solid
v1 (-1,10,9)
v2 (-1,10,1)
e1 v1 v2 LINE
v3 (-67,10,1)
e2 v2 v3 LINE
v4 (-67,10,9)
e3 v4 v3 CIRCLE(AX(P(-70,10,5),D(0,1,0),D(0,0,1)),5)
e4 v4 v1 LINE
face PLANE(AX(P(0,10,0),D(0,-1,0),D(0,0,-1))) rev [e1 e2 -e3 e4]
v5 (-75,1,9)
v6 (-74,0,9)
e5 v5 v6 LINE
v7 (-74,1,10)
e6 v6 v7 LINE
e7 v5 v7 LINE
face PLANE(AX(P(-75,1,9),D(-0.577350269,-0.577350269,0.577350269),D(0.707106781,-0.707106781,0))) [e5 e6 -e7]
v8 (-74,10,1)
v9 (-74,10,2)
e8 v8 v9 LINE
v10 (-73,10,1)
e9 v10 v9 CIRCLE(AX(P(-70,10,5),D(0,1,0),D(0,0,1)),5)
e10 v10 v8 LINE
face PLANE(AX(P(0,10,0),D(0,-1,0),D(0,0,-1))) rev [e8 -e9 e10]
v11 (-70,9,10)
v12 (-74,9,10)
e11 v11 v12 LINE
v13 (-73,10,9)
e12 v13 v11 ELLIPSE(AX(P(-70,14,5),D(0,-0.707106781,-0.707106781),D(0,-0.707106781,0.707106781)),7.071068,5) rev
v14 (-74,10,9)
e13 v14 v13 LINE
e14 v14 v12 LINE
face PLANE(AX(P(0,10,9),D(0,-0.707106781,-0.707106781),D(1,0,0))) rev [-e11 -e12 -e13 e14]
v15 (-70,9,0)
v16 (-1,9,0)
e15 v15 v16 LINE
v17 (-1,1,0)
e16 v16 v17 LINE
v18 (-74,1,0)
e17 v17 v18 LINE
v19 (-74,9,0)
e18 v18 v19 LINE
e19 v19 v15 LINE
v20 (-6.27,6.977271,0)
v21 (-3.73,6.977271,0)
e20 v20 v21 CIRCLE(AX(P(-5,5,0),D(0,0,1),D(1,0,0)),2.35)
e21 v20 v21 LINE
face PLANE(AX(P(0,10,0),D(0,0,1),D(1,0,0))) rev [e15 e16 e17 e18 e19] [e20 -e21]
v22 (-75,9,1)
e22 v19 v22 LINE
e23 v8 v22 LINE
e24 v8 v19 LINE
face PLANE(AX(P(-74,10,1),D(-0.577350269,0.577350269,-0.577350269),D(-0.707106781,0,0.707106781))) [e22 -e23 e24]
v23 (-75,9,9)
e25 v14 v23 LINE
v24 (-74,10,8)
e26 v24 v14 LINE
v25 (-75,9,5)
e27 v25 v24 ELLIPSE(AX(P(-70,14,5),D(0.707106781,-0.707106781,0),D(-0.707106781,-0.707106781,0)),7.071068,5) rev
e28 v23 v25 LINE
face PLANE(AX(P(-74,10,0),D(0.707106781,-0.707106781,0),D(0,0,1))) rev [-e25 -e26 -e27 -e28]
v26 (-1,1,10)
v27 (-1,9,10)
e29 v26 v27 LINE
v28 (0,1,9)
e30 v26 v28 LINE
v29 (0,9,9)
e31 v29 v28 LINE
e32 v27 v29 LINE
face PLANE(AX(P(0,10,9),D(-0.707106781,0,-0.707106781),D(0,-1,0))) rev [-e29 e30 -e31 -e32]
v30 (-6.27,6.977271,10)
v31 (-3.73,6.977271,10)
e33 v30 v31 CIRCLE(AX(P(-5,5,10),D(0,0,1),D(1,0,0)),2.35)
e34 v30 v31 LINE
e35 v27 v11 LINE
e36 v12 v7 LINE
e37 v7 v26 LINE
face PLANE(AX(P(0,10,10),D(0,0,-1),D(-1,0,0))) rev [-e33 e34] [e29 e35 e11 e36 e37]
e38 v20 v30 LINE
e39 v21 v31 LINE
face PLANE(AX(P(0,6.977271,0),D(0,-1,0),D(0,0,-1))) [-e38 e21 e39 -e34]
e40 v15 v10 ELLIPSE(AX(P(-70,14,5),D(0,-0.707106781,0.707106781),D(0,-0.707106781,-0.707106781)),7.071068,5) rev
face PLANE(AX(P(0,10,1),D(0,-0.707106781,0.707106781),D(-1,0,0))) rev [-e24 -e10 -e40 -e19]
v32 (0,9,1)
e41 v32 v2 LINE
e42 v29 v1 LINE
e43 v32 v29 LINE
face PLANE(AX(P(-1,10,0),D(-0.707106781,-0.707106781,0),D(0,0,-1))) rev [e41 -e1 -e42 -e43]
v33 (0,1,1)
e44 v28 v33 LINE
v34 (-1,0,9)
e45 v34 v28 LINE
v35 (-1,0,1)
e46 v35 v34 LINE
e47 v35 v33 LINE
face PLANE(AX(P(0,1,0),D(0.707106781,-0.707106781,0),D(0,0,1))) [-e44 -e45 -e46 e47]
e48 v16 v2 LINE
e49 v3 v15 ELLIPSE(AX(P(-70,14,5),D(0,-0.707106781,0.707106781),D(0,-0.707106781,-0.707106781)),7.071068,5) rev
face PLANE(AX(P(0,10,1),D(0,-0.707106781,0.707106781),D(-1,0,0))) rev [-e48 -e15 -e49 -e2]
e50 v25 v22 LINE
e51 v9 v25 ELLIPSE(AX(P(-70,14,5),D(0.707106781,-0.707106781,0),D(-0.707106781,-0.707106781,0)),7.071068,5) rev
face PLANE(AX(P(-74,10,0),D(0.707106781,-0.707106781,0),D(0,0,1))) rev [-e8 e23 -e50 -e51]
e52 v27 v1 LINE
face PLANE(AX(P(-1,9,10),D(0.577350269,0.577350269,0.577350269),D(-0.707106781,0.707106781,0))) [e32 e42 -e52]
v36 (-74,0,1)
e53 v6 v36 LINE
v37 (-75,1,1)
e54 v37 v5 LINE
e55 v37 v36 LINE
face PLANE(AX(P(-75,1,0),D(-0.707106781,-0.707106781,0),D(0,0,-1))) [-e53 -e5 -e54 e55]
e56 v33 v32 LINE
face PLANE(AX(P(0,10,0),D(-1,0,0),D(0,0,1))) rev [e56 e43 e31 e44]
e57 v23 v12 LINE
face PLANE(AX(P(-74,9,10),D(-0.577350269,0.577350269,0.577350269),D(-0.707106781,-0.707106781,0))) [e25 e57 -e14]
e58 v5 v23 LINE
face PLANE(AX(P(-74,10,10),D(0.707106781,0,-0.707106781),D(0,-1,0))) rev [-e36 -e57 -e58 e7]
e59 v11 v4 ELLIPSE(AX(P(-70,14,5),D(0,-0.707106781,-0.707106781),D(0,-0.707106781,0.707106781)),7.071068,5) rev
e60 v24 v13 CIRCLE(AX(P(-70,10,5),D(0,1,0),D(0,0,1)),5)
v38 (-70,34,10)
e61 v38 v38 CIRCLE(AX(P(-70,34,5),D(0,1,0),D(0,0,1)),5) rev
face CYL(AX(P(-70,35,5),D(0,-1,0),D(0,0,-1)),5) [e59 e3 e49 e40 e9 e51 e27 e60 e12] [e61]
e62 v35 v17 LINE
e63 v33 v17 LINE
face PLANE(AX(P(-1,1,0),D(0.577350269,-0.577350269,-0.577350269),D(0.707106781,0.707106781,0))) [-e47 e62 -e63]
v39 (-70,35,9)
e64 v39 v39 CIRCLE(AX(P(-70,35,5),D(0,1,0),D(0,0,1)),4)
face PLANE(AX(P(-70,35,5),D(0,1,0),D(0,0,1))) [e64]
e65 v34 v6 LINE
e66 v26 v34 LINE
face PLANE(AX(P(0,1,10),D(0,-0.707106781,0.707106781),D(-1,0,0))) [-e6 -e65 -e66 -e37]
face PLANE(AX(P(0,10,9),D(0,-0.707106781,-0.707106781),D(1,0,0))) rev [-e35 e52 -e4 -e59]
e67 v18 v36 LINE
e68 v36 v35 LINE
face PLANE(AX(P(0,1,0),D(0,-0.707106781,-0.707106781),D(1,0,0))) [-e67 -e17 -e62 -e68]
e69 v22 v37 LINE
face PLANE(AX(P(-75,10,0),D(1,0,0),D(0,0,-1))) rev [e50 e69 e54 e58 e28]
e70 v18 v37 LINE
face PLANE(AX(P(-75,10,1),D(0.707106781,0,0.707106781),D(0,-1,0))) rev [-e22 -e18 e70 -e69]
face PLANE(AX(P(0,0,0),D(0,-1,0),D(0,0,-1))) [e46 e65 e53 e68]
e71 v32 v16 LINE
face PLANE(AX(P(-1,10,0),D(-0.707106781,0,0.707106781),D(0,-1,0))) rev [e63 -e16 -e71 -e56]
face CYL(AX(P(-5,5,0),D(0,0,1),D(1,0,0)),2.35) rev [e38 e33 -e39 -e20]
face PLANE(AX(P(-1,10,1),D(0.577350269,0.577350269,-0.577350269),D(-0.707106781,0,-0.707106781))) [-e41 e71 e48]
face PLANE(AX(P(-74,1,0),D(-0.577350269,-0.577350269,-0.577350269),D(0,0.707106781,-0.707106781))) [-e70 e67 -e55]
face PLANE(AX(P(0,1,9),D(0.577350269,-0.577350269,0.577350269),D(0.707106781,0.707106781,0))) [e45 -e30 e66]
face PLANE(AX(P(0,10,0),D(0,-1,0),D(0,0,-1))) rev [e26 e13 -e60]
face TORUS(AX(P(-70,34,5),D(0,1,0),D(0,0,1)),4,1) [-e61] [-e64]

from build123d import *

# Parameters (mm, degrees)
SKETCH8_W           = 75
SKETCH8_H           = 10
BOSS_EXTRUDE5_DEPTH = 10
SKETCH9_R           = 5
BOSS_EXTRUDE7_DEPTH = 25
CUT_EXTRUDE1_DEPTH  = 84.366660003
CHAMFER1_SIZE       = 1
FILLET1_R           = 1


with BuildPart() as part:
    # Sketch8 → Boss-Extrude5 (new body)
    with BuildSketch(Plane(origin=(0, 0, 0), x_dir=(1, 0, 0), z_dir=(0, 1, 0))):
        with Locations((-37.5, -5)):
            Rectangle(SKETCH8_W, SKETCH8_H)
    extrude(amount=BOSS_EXTRUDE5_DEPTH)

    # Sketch9 → Boss-Extrude7 (add)
    with BuildSketch(Plane(origin=(0, 10, 0), x_dir=(1, 0, 0), z_dir=(0, 1, 0))):
        with Locations(Location((-70, -5, 0), (0, 0, 270))):
            Circle(SKETCH9_R)
    extrude(amount=BOSS_EXTRUDE7_DEPTH)

    # Sketch13 → Cut-Extrude1 (cut, through all)
    with BuildSketch(Plane.XY.offset(10)):
        with BuildLine():
            Line((-3.73, 6.977270846), (-6.27, 6.977270846))
            ThreePointArc((-6.27, 6.977270846), (-6.126499001, 2.937598487), (-2.65, 5))
            ThreePointArc((-2.65, 5), (-2.937598487, 6.126499001), (-3.73, 6.977270846))
        make_face()
    extrude(amount=-CUT_EXTRUDE1_DEPTH, mode=Mode.SUBTRACT)

    # Chamfer1
    # the kernel refuses this chamfer: 1 mm, written as the material it takes off along each edge
    with BuildSketch(Plane(origin=(-74.333333333, 9.333333333, 0.666666667), x_dir=(-0.7071067811865476, 0, 0.7071067811865475), z_dir=(-0.5773502691896257, 0.5773502691896256, -0.5773502691896258)), Plane(origin=(-74.333333333, 9.333333333, 9.333333333), x_dir=(0, 0.7071067811865475, -0.7071067811865475), z_dir=(-0.5773502691896258, 0.5773502691896258, 0.5773502691896258)), Plane(origin=(-0.666666667, 9.333333333, 9.333333333), x_dir=(0.7071067811865479, 0, -0.7071067811865471), z_dir=(0.5773502691896254, 0.577350269189626, 0.577350269189626)), Plane(origin=(-74.333333333, 0.666666667, 0.666666667), x_dir=(0, -0.7071067811865476, 0.7071067811865476), z_dir=(-0.5773502691896256, -0.5773502691896258, -0.5773502691896258)), Plane(origin=(-0.666666667, 0.666666667, 0.666666667), x_dir=(0.7071067811865476, 0, 0.7071067811865475), z_dir=(0.5773502691896257, -0.5773502691896257, -0.5773502691896258))) as chamfer1_piece_1:
        Polygon((-0.707106781, -0.40824829), (0.707106781, -0.40824829), (0, 0.816496581), align=None)
    extrude(amount=1.270170592, mode=Mode.SUBTRACT)
    with BuildSketch(Plane(origin=(-0.666666667, 9.333333333, 0.666666667), x_dir=(0.7071067811865476, 0, 0.7071067811865475), z_dir=(0.5773502691896257, 0.5773502691896257, -0.5773502691896258)), Plane(origin=(-74.333333333, 0.666666667, 9.333333333), x_dir=(0, -0.7071067811865475, -0.7071067811865476), z_dir=(-0.5773502691896256, -0.5773502691896258, 0.5773502691896257)), Plane(origin=(-0.666666667, 0.666666667, 9.333333333), x_dir=(0.7071067811865479, 0, -0.7071067811865471), z_dir=(0.5773502691896253, -0.577350269189626, 0.5773502691896258))) as chamfer1_piece_2:
        Polygon((-0.707106781, 0.40824829), (0.707106781, 0.40824829), (0, -0.816496581), align=None)
    extrude(amount=1.270170592, mode=Mode.SUBTRACT)
    with BuildSketch(Plane(origin=(-75, 10, -2.571682988), x_dir=(-0.0274958766105822, -0.999621916911297, 0), z_dir=(0, 0, 1))) as chamfer1_piece_3_section:
        Polygon((CHAMFER1_SIZE * 0.999621916911, CHAMFER1_SIZE * 0.0274958766106), (-CHAMFER1_SIZE * 0.0274958766106, CHAMFER1_SIZE * 0.999621916911), (0, 0), align=None)
    chamfer1_piece_3 = extrude(amount=7.571682988, mode=Mode.PRIVATE)
    chamfer1_piece_3 = chamfer1_piece_3 - Plane(origin=(-70, 9.64391603, 5), x_dir=(0, 0, 1), z_dir=(0, -1, 0)) * Cylinder(5, 20, mode=Mode.PRIVATE)
    add(chamfer1_piece_3, mode=Mode.SUBTRACT)
    with BuildSketch(Plane(origin=(-77.571682988, 10, 10), x_dir=(0, -0.9996219169112968, 0.027495876610585647), z_dir=(1, 0, 0))) as chamfer1_piece_4_section:
        Polygon((CHAMFER1_SIZE * 0.999621916911, CHAMFER1_SIZE * 0.0274958766106), (-CHAMFER1_SIZE * 0.0274958766106, CHAMFER1_SIZE * 0.999621916911), (0, 0), align=None)
    chamfer1_piece_4 = extrude(amount=7.571682988, mode=Mode.PRIVATE)
    chamfer1_piece_4 = chamfer1_piece_4 - Plane(origin=(-70, 9.64391603, 5), x_dir=(0, 0, 1), z_dir=(0, -1, 0)) * Cylinder(5, 20, mode=Mode.PRIVATE)
    add(chamfer1_piece_4, mode=Mode.SUBTRACT)
    with BuildSketch(Plane(origin=(-69.999999992, 10, 0), x_dir=(0, -0.9996219169112968, -0.0274958766105864), z_dir=(-1, 0, 0))) as chamfer1_piece_5_section:
        Polygon((CHAMFER1_SIZE * 0.999621916911, CHAMFER1_SIZE * 0.0274958766106), (-CHAMFER1_SIZE * 0.0274958766106, CHAMFER1_SIZE * 0.999621916911), (0, 0), align=None)
    chamfer1_piece_5 = extrude(amount=7.571682996, mode=Mode.PRIVATE)
    chamfer1_piece_5 = chamfer1_piece_5 - Plane(origin=(-70, 9.643916029, 5), x_dir=(0, 0, 1), z_dir=(0, -1, 0)) * Cylinder(5, 20, mode=Mode.PRIVATE)
    add(chamfer1_piece_5, mode=Mode.SUBTRACT)
    with BuildSketch(Plane(origin=(-75, 10, 5), x_dir=(-0.0274958766105822, -0.999621916911297, 0), z_dir=(0, 0, 1))) as chamfer1_piece_6_section:
        Polygon((CHAMFER1_SIZE * 0.999621916911, CHAMFER1_SIZE * 0.0274958766106), (-CHAMFER1_SIZE * 0.0274958766106, CHAMFER1_SIZE * 0.999621916911), (0, 0), align=None)
    chamfer1_piece_6 = extrude(amount=7.571682988, mode=Mode.PRIVATE)
    chamfer1_piece_6 = chamfer1_piece_6 - Plane(origin=(-70, 9.643916029, 5), x_dir=(0, 0, 1), z_dir=(0, -1, 0)) * Cylinder(5, 20, mode=Mode.PRIVATE)
    add(chamfer1_piece_6, mode=Mode.SUBTRACT)
    with BuildSketch(Plane(origin=(-70, 10, 10), x_dir=(0, 0.027495876610585647, -0.9996219169112968), z_dir=(1, 0, 0))) as chamfer1_piece_7_section:
        Polygon((CHAMFER1_SIZE * 0.999621916911, -CHAMFER1_SIZE * 0.0274958766106), (-CHAMFER1_SIZE * 0.0274958766106, -CHAMFER1_SIZE * 0.999621916911), (0, 0), align=None)
    chamfer1_piece_7 = extrude(amount=72.571682988, mode=Mode.PRIVATE)
    chamfer1_piece_7 = chamfer1_piece_7 - Plane(origin=(-70, 9.665551568, 5), x_dir=(0, 0, 1), z_dir=(0, -1, 0)) * Cylinder(5, 150, mode=Mode.PRIVATE)
    add(chamfer1_piece_7, mode=Mode.SUBTRACT)
    with BuildSketch(Plane(origin=(0, 10, 12.571682988), x_dir=(0.027495876610586414, -0.9996219169112968, 0), z_dir=(0, 0, -1)), Plane(origin=(-75, 0, -2.571682988), x_dir=(0.9996219169112968, -0.027495876610586483, 0), z_dir=(0, 0, 1)), Plane(origin=(0, -2.571682988, 10), x_dir=(0.02749587661058629, 0, -0.9996219169112968), z_dir=(0, 1, 0)), Plane(origin=(0, -2.571682988, 0), x_dir=(-0.9996219169112968, 0, -0.02749587661058625), z_dir=(0, 1, 0))) as chamfer1_piece_8:
        Polygon((CHAMFER1_SIZE * 0.999621916911, CHAMFER1_SIZE * 0.0274958766106), (-CHAMFER1_SIZE * 0.0274958766106, CHAMFER1_SIZE * 0.999621916911), (0, 0), align=None)
    extrude(amount=15.143365976, mode=Mode.SUBTRACT)
    with BuildSketch(Plane(origin=(-77.571682988, 0, 10), x_dir=(0, -0.02749587661058639, -0.9996219169112968), z_dir=(1, 0, 0))) as chamfer1_piece_9:
        Polygon((CHAMFER1_SIZE * 0.999621916911, CHAMFER1_SIZE * 0.0274958766106), (-CHAMFER1_SIZE * 0.0274958766106, CHAMFER1_SIZE * 0.999621916911), (0, 0), align=None)
    extrude(amount=80.143365976, mode=Mode.SUBTRACT)
    with BuildSketch(Plane(origin=(2.571682988, 0, 0), x_dir=(0, 0.9996219169112968, -0.027495876610586382), z_dir=(-1, 0, 0))) as chamfer1_piece_10:
        Polygon((CHAMFER1_SIZE * 0.999621916911, -CHAMFER1_SIZE * 0.0274958766106), (-CHAMFER1_SIZE * 0.0274958766106, -CHAMFER1_SIZE * 0.999621916911), (0, 0), align=None)
    extrude(amount=80.143365976, mode=Mode.SUBTRACT)
    with BuildSketch(Plane(origin=(0, 0, 12.571682988), x_dir=(0.027495876610586393, 0.9996219169112968, 0), z_dir=(0, 0, -1)), Plane(origin=(-75, -2.571682988, 10), x_dir=(-0.0274958766105822, 0, -0.999621916911297), z_dir=(0, 1, 0)), Plane(origin=(-75, -2.571682988, 0), x_dir=(0.9996219169112968, 0, -0.0274958766105866), z_dir=(0, 1, 0))) as chamfer1_piece_11:
        Polygon((CHAMFER1_SIZE * 0.999621916911, -CHAMFER1_SIZE * 0.0274958766106), (-CHAMFER1_SIZE * 0.0274958766106, -CHAMFER1_SIZE * 0.999621916911), (0, 0), align=None)
    extrude(amount=15.143365976, mode=Mode.SUBTRACT)
    with BuildSketch(Plane(origin=(2.571682988, 10, 0), x_dir=(0, -0.9996219169112968, -0.0274958766105864), z_dir=(-1, 0, 0))) as chamfer1_piece_12_section:
        Polygon((CHAMFER1_SIZE * 0.999621916911, CHAMFER1_SIZE * 0.0274958766106), (-CHAMFER1_SIZE * 0.0274958766106, CHAMFER1_SIZE * 0.999621916911), (0, 0), align=None)
    chamfer1_piece_12 = extrude(amount=72.571682979, mode=Mode.PRIVATE)
    chamfer1_piece_12 = chamfer1_piece_12 - Plane(origin=(-70, 9.665551567, 5), x_dir=(0, 0, 1), z_dir=(0, -1, 0)) * Cylinder(5, 150, mode=Mode.PRIVATE)
    add(chamfer1_piece_12, mode=Mode.SUBTRACT)

    # Fillet1
    fillet1_edges = [part.edges().sort_by_distance(p)[0] for p in [
        (-70, 35, 0),
    ]]
    fillet(fillet1_edges, radius=FILLET1_R)


solid = part.part
